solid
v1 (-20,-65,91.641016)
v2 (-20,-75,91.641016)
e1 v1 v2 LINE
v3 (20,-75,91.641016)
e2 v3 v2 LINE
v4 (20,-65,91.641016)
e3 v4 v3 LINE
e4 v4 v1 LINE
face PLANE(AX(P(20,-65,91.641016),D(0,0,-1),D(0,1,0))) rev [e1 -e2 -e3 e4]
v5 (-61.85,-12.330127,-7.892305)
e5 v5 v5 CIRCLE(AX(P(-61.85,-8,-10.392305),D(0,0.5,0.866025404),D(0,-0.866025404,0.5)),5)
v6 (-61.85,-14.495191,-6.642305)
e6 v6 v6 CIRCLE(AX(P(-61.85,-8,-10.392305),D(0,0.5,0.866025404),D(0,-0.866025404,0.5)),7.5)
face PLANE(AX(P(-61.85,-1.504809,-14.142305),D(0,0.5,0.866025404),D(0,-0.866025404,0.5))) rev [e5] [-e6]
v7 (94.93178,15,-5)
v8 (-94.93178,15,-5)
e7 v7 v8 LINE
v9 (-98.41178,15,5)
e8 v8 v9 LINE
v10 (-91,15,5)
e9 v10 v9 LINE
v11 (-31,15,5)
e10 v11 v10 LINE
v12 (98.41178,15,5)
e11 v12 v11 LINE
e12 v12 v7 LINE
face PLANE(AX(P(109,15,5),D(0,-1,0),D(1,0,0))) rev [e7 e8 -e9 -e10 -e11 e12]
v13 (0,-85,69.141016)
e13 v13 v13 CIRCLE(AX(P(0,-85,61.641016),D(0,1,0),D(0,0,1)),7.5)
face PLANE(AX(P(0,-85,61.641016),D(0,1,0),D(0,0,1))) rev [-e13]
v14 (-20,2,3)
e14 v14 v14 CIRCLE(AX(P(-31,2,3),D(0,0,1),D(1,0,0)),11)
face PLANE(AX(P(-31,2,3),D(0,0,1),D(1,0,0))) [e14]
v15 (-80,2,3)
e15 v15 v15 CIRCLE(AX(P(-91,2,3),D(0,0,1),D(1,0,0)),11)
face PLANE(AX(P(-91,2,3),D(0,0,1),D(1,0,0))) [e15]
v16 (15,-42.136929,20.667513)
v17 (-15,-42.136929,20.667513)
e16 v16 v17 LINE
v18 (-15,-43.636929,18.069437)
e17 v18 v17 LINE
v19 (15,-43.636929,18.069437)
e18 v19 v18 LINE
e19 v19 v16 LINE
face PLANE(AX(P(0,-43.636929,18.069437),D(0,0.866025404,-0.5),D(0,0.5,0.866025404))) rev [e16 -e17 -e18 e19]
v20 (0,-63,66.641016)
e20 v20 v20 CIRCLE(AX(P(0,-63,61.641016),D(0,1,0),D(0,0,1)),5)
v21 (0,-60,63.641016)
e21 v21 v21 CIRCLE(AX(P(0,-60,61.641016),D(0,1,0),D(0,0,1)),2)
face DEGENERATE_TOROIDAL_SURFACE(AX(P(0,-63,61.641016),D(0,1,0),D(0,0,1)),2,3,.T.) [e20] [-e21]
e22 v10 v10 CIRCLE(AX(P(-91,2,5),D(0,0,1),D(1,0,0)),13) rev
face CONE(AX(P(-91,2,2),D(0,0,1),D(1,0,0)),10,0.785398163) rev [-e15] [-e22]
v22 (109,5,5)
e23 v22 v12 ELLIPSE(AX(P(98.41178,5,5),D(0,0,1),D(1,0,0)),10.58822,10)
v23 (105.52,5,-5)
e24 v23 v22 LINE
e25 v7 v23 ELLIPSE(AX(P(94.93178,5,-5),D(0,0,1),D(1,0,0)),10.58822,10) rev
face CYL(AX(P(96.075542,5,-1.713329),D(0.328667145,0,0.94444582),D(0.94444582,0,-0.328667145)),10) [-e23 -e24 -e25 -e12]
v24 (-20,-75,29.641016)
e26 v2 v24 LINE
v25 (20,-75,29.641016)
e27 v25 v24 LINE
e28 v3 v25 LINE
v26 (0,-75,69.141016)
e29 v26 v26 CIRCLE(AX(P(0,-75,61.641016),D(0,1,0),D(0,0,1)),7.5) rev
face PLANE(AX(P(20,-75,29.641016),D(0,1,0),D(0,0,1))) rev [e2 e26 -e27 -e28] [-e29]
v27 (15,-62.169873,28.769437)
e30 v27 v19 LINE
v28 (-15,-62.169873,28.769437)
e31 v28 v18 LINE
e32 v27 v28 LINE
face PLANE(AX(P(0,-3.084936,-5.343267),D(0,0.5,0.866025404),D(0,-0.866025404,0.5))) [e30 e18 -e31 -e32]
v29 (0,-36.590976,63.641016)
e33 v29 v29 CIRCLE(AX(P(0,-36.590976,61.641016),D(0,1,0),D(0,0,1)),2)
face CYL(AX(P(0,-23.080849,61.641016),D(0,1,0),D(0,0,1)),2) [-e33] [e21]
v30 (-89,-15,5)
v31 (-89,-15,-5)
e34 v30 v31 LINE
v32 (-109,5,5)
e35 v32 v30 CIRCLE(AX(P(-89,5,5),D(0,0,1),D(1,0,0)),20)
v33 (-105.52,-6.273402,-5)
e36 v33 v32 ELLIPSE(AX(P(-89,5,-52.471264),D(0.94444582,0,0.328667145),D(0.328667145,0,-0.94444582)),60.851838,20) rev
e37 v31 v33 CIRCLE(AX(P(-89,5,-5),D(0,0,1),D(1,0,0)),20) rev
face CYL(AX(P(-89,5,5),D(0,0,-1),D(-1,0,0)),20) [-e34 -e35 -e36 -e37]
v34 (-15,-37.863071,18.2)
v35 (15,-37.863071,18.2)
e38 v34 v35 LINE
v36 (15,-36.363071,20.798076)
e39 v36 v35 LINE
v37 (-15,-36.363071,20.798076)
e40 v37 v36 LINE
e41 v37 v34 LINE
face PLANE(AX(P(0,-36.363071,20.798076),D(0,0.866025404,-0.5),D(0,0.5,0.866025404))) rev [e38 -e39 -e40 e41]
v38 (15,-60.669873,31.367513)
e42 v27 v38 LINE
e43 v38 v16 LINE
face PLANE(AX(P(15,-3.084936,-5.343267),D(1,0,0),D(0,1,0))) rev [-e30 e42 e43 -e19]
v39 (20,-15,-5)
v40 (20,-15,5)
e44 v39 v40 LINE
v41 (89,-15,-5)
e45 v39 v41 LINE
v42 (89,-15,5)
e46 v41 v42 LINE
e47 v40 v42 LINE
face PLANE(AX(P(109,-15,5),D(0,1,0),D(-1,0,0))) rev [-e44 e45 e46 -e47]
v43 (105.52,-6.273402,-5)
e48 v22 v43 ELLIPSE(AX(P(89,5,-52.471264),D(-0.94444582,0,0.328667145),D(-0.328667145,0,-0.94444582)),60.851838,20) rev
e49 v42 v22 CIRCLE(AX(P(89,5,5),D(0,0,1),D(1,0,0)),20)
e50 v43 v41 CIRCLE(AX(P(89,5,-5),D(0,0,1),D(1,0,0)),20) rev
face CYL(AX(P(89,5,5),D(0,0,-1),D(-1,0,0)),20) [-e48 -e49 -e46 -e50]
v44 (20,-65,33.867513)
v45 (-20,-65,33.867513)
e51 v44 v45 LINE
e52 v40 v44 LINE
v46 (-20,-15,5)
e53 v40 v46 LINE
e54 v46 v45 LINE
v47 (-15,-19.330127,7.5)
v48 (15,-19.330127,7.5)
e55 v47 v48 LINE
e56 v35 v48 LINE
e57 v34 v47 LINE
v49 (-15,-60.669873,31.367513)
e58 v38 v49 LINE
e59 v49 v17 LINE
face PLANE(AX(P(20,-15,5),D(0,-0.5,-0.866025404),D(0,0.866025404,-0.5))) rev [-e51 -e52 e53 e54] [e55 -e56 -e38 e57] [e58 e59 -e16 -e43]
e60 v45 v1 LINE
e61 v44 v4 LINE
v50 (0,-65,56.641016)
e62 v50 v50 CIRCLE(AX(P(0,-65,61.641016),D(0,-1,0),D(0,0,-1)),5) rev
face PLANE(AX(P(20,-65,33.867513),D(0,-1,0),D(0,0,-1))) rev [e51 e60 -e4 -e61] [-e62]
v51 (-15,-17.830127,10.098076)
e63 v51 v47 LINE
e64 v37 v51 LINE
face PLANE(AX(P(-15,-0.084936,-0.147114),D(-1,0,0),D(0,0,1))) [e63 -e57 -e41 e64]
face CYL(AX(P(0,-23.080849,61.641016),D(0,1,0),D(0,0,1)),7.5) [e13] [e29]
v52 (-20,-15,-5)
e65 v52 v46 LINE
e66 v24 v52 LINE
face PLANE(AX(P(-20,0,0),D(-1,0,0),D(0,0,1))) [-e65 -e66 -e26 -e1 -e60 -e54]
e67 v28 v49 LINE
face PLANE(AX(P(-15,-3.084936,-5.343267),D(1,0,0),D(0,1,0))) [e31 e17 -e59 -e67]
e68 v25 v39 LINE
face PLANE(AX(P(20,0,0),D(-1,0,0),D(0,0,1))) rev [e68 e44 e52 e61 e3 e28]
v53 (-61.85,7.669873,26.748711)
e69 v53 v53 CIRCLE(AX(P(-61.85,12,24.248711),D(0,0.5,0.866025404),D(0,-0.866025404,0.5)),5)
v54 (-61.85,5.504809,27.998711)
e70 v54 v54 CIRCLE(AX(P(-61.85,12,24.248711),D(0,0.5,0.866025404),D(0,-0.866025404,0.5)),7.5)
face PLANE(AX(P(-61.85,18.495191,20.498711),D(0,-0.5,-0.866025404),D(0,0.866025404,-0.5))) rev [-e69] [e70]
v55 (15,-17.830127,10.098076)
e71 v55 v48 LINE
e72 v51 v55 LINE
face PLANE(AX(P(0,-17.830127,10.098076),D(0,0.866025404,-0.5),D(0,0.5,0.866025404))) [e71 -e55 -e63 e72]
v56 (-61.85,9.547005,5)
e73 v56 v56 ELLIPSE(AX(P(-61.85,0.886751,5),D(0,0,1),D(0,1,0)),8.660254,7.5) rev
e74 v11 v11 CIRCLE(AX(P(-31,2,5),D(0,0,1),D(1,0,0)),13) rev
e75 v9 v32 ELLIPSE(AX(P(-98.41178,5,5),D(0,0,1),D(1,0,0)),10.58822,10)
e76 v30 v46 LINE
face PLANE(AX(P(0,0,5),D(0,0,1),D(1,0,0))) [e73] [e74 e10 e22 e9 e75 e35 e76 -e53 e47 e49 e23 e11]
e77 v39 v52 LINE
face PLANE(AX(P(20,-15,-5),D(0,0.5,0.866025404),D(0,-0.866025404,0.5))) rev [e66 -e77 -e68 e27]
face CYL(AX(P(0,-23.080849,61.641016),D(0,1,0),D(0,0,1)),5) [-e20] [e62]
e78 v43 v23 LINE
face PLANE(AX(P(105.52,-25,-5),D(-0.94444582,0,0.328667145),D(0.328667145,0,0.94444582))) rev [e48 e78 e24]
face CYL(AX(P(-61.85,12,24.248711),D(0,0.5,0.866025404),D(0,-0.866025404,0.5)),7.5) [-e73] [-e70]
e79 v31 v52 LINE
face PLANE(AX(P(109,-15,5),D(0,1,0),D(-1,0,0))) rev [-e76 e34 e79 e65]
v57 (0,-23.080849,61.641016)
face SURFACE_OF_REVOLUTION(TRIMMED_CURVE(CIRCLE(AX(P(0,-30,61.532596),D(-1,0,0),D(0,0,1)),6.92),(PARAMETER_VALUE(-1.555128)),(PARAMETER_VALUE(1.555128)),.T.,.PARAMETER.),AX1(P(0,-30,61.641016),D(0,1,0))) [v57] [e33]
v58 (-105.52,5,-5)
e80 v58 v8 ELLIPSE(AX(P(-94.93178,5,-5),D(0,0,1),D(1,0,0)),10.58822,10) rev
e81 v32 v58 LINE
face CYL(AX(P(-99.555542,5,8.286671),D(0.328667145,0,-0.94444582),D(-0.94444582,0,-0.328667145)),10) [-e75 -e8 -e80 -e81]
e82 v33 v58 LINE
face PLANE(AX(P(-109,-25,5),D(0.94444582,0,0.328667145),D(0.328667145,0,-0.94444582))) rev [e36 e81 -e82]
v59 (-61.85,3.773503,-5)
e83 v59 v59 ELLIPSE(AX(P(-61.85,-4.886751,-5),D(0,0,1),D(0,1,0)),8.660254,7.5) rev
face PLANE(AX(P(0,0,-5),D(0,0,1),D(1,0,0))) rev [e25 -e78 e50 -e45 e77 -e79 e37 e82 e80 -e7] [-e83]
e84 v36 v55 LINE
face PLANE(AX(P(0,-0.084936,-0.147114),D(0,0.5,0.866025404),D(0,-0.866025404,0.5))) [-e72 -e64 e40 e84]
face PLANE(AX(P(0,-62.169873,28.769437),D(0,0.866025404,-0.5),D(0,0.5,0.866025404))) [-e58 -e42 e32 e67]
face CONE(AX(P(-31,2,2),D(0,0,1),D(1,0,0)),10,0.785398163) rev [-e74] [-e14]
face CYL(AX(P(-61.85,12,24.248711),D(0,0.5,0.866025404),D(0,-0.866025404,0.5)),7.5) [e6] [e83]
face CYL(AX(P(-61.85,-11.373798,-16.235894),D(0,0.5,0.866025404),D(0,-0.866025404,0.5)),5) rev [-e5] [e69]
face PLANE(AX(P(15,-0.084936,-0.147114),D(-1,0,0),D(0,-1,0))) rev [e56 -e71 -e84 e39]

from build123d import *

# Parameters (mm, degrees)
SKETCH2_W           = 218
SKETCH2_H           = 30
BOSS_EXTRUDE1_DEPTH = 5
FILLET1_R           = 20
SKETCH3_R           = 10
CUT_EXTRUDE1_DEPTH  = 2
CHAMFER1_SIZE       = 3
SKETCH6_R           = 5
CUT_EXTRUDE2_DEPTH  = 119.749210232
BOSS_EXTRUDE2_DEPTH = 20
SKETCH8_W           = 30
SKETCH8_H           = 21.4
BOSS_EXTRUDE4_DEPTH = 3
SKETCH9_W           = 30
SKETCH9_H           = 21.4
CUT_EXTRUDE3_DEPTH  = 3
CUT_EXTRUDE4_DEPTH  = 40
FILLET2_R           = 10
CUT_EXTRUDE5_DEPTH  = 40
FILLET3_R           = 10


with BuildPart() as part:
    # Sketch2 → Boss-Extrude1 (new, symmetric)
    with BuildSketch(Plane.XY):
        Rectangle(SKETCH2_W, SKETCH2_H)
    extrude(amount=BOSS_EXTRUDE1_DEPTH, both=True)

    # Fillet1
    fillet1_edges = [part.edges().sort_by_distance(p)[0] for p in [
        (109, -15, 0),
        (-109, -15, 0),
    ]]
    fillet(fillet1_edges, radius=FILLET1_R)

    # Sketch3 → Cut-Extrude1 (cut, symmetric)
    with BuildSketch(Plane.XY.offset(5)):
        with Locations((-91, 2)):
            Circle(SKETCH3_R)
        with Locations((-31, 2)):
            Circle(SKETCH3_R)
    extrude(amount=CUT_EXTRUDE1_DEPTH, both=True, mode=Mode.SUBTRACT)

    # Chamfer1
    # the kernel refuses this chamfer: 3 mm, written as the material it takes off along each edge
    with BuildSketch(Plane(origin=(-31, 2, 5), x_dir=(1, 0, 0), z_dir=(0, -1, 0))) as chamfer1_piece_1_section:
        Polygon((10 + CHAMFER1_SIZE, 0), (10, -CHAMFER1_SIZE), (10, 0), align=None)
    chamfer1_piece_1 = revolve(axis=Axis((-31, 2, 5), (0, 0, 1)), mode=Mode.PRIVATE)
    chamfer1_piece_1 = split(chamfer1_piece_1, bisect_by=Plane(origin=(-42.994962735, 2, 3), z_dir=(0, 0, 1)), keep=Keep.TOP, mode=Mode.PRIVATE)
    add(chamfer1_piece_1, mode=Mode.SUBTRACT)
    with BuildSketch(Plane(origin=(-91, 2, 5), x_dir=(1, 0, 0), z_dir=(0, -1, 0))) as chamfer1_piece_2_section:
        Polygon((10 + CHAMFER1_SIZE, 0), (10, -CHAMFER1_SIZE), (10, 0), align=None)
    chamfer1_piece_2 = revolve(axis=Axis((-91, 2, 5), (0, 0, 1)), mode=Mode.PRIVATE)
    chamfer1_piece_2 = split(chamfer1_piece_2, bisect_by=Plane(origin=(-102.994962728, 2, 3), z_dir=(0, 0, 1)), keep=Keep.TOP, mode=Mode.PRIVATE)
    add(chamfer1_piece_2, mode=Mode.SUBTRACT)

    # Sketch5 → Revolve1 (revolve)
    with BuildSketch(Plane(origin=(-61.85, 0, 0), x_dir=(0, 0, -1), z_dir=(1, 0, 0)), mode=Mode.PRIVATE) as revolve1_sk:
        Polygon((-20.498711306, 18.495190528), (-24.248711306, 12), (10.392304845, -8), (14.142304845, -1.504809472), align=None)
    revolve(revolve1_sk.sketch.rotate(Axis((-61.85, 12, 24.248711306), (0, -0.4999999999999977, -0.86602540378444)), 180), axis=Axis((-61.85, 12, 24.248711306), (0, -0.4999999999999977, -0.86602540378444)))

    # Sketch6 → Cut-Extrude2 (cut, through all)
    with BuildSketch(Plane(origin=(0, 13.5, 23.382685902), x_dir=(1, 0, 0), z_dir=(0, 0.4999999999999978, 0.86602540378444))):
        with Locations(Location((-61.85, -1.732050808, 0), (0, 0, 270))):
            Circle(SKETCH6_R)
    extrude(amount=-CUT_EXTRUDE2_DEPTH, mode=Mode.SUBTRACT)

    # Sketch7 → Boss-Extrude2 (add, symmetric)
    with BuildSketch(Plane(origin=(0, 0, 0), x_dir=(0, 0, -1), z_dir=(1, 0, 0))):
        Polygon((5, -15), (-5, -15), (-33.867513459, -65), (-91.641016151, -65), (-91.641016151, -75), (-29.641016151, -75), align=None)
    extrude(amount=BOSS_EXTRUDE2_DEPTH, both=True)

    # Sketch8 → Boss-Extrude4 (add)
    with BuildSketch(Plane(origin=(0, -1.584936491, -2.745190528), x_dir=(1, 0, 0), z_dir=(0, 0.49999999999999756, 0.86602540378444))):
        with Locations((0, -31.190381057)):
            Rectangle(SKETCH8_W, SKETCH8_H)
    extrude(amount=BOSS_EXTRUDE4_DEPTH)

    # Sketch9 → Cut-Extrude3 (cut)
    with BuildSketch(Plane(origin=(0, -1.584936491, -2.745190528), x_dir=(1, 0, 0), z_dir=(0, 0.49999999999999756, 0.86602540378444))):
        with Locations((0, -57.525407976)):
            Rectangle(SKETCH9_W, SKETCH9_H)
    extrude(amount=-CUT_EXTRUDE3_DEPTH, mode=Mode.SUBTRACT)

    # Sketch10 → Revolve2 (revolve)
    with BuildSketch(Plane(origin=(0, 0, 0), x_dir=(0, 0, -1), z_dir=(1, 0, 0)), mode=Mode.PRIVATE) as revolve2_sk:
        with BuildLine():
            Line((-61.641016151, -23.080849404), (-61.641016151, -85))
            Line((-61.641016151, -85), (-54.141016151, -85))
            Line((-54.141016151, -85), (-54.141016151, -75))
            Line((-54.141016151, -75), (-56.641016151, -75))
            Line((-56.641016151, -75), (-56.641016151, -63))
            ThreePointArc((-56.641016151, -63), (-57.519695808, -60.878679656), (-59.641016151, -60))
            Line((-59.641016151, -60), (-59.641016151, -36.590975833))
            ThreePointArc((-59.641016151, -36.590975833), (-54.904038671, -28.986627083), (-61.641016151, -23.080849404))
        make_face()
    revolve(revolve2_sk.sketch.rotate(Axis((0, -23.080849404, 61.641016151), (0, -1, 0)), 180), axis=Axis((0, -23.080849404, 61.641016151), (0, -1, 0)))

    # Sketch11 → Cut-Extrude4 (cut)
    with BuildSketch(Plane(origin=(0, 15, 0), x_dir=(1, 0, 0), z_dir=(0, 1, 0))):
        Polygon((-109, 5), (-109, -5), (-105.52, 5), align=None)
    extrude(amount=-CUT_EXTRUDE4_DEPTH, mode=Mode.SUBTRACT)

    # Fillet2
    fillet2_edges = [part.edges().sort_by_distance(p)[0] for p in [
        (-107.26, 15, 0),
    ]]
    fillet(fillet2_edges, radius=FILLET2_R)

    # Sketch13 → Cut-Extrude5 (cut)
    with BuildSketch(Plane(origin=(0, 15, 0), x_dir=(1, 0, 0), z_dir=(0, 1, 0))):
        Polygon((109, 5), (109, -5), (105.52, 5), align=None)
    extrude(amount=-CUT_EXTRUDE5_DEPTH, mode=Mode.SUBTRACT)

    # Fillet3
    fillet3_edges = [part.edges().sort_by_distance(p)[0] for p in [
        (107.26, 15, 0),
    ]]
    fillet(fillet3_edges, radius=FILLET3_R)


solid = part.part
